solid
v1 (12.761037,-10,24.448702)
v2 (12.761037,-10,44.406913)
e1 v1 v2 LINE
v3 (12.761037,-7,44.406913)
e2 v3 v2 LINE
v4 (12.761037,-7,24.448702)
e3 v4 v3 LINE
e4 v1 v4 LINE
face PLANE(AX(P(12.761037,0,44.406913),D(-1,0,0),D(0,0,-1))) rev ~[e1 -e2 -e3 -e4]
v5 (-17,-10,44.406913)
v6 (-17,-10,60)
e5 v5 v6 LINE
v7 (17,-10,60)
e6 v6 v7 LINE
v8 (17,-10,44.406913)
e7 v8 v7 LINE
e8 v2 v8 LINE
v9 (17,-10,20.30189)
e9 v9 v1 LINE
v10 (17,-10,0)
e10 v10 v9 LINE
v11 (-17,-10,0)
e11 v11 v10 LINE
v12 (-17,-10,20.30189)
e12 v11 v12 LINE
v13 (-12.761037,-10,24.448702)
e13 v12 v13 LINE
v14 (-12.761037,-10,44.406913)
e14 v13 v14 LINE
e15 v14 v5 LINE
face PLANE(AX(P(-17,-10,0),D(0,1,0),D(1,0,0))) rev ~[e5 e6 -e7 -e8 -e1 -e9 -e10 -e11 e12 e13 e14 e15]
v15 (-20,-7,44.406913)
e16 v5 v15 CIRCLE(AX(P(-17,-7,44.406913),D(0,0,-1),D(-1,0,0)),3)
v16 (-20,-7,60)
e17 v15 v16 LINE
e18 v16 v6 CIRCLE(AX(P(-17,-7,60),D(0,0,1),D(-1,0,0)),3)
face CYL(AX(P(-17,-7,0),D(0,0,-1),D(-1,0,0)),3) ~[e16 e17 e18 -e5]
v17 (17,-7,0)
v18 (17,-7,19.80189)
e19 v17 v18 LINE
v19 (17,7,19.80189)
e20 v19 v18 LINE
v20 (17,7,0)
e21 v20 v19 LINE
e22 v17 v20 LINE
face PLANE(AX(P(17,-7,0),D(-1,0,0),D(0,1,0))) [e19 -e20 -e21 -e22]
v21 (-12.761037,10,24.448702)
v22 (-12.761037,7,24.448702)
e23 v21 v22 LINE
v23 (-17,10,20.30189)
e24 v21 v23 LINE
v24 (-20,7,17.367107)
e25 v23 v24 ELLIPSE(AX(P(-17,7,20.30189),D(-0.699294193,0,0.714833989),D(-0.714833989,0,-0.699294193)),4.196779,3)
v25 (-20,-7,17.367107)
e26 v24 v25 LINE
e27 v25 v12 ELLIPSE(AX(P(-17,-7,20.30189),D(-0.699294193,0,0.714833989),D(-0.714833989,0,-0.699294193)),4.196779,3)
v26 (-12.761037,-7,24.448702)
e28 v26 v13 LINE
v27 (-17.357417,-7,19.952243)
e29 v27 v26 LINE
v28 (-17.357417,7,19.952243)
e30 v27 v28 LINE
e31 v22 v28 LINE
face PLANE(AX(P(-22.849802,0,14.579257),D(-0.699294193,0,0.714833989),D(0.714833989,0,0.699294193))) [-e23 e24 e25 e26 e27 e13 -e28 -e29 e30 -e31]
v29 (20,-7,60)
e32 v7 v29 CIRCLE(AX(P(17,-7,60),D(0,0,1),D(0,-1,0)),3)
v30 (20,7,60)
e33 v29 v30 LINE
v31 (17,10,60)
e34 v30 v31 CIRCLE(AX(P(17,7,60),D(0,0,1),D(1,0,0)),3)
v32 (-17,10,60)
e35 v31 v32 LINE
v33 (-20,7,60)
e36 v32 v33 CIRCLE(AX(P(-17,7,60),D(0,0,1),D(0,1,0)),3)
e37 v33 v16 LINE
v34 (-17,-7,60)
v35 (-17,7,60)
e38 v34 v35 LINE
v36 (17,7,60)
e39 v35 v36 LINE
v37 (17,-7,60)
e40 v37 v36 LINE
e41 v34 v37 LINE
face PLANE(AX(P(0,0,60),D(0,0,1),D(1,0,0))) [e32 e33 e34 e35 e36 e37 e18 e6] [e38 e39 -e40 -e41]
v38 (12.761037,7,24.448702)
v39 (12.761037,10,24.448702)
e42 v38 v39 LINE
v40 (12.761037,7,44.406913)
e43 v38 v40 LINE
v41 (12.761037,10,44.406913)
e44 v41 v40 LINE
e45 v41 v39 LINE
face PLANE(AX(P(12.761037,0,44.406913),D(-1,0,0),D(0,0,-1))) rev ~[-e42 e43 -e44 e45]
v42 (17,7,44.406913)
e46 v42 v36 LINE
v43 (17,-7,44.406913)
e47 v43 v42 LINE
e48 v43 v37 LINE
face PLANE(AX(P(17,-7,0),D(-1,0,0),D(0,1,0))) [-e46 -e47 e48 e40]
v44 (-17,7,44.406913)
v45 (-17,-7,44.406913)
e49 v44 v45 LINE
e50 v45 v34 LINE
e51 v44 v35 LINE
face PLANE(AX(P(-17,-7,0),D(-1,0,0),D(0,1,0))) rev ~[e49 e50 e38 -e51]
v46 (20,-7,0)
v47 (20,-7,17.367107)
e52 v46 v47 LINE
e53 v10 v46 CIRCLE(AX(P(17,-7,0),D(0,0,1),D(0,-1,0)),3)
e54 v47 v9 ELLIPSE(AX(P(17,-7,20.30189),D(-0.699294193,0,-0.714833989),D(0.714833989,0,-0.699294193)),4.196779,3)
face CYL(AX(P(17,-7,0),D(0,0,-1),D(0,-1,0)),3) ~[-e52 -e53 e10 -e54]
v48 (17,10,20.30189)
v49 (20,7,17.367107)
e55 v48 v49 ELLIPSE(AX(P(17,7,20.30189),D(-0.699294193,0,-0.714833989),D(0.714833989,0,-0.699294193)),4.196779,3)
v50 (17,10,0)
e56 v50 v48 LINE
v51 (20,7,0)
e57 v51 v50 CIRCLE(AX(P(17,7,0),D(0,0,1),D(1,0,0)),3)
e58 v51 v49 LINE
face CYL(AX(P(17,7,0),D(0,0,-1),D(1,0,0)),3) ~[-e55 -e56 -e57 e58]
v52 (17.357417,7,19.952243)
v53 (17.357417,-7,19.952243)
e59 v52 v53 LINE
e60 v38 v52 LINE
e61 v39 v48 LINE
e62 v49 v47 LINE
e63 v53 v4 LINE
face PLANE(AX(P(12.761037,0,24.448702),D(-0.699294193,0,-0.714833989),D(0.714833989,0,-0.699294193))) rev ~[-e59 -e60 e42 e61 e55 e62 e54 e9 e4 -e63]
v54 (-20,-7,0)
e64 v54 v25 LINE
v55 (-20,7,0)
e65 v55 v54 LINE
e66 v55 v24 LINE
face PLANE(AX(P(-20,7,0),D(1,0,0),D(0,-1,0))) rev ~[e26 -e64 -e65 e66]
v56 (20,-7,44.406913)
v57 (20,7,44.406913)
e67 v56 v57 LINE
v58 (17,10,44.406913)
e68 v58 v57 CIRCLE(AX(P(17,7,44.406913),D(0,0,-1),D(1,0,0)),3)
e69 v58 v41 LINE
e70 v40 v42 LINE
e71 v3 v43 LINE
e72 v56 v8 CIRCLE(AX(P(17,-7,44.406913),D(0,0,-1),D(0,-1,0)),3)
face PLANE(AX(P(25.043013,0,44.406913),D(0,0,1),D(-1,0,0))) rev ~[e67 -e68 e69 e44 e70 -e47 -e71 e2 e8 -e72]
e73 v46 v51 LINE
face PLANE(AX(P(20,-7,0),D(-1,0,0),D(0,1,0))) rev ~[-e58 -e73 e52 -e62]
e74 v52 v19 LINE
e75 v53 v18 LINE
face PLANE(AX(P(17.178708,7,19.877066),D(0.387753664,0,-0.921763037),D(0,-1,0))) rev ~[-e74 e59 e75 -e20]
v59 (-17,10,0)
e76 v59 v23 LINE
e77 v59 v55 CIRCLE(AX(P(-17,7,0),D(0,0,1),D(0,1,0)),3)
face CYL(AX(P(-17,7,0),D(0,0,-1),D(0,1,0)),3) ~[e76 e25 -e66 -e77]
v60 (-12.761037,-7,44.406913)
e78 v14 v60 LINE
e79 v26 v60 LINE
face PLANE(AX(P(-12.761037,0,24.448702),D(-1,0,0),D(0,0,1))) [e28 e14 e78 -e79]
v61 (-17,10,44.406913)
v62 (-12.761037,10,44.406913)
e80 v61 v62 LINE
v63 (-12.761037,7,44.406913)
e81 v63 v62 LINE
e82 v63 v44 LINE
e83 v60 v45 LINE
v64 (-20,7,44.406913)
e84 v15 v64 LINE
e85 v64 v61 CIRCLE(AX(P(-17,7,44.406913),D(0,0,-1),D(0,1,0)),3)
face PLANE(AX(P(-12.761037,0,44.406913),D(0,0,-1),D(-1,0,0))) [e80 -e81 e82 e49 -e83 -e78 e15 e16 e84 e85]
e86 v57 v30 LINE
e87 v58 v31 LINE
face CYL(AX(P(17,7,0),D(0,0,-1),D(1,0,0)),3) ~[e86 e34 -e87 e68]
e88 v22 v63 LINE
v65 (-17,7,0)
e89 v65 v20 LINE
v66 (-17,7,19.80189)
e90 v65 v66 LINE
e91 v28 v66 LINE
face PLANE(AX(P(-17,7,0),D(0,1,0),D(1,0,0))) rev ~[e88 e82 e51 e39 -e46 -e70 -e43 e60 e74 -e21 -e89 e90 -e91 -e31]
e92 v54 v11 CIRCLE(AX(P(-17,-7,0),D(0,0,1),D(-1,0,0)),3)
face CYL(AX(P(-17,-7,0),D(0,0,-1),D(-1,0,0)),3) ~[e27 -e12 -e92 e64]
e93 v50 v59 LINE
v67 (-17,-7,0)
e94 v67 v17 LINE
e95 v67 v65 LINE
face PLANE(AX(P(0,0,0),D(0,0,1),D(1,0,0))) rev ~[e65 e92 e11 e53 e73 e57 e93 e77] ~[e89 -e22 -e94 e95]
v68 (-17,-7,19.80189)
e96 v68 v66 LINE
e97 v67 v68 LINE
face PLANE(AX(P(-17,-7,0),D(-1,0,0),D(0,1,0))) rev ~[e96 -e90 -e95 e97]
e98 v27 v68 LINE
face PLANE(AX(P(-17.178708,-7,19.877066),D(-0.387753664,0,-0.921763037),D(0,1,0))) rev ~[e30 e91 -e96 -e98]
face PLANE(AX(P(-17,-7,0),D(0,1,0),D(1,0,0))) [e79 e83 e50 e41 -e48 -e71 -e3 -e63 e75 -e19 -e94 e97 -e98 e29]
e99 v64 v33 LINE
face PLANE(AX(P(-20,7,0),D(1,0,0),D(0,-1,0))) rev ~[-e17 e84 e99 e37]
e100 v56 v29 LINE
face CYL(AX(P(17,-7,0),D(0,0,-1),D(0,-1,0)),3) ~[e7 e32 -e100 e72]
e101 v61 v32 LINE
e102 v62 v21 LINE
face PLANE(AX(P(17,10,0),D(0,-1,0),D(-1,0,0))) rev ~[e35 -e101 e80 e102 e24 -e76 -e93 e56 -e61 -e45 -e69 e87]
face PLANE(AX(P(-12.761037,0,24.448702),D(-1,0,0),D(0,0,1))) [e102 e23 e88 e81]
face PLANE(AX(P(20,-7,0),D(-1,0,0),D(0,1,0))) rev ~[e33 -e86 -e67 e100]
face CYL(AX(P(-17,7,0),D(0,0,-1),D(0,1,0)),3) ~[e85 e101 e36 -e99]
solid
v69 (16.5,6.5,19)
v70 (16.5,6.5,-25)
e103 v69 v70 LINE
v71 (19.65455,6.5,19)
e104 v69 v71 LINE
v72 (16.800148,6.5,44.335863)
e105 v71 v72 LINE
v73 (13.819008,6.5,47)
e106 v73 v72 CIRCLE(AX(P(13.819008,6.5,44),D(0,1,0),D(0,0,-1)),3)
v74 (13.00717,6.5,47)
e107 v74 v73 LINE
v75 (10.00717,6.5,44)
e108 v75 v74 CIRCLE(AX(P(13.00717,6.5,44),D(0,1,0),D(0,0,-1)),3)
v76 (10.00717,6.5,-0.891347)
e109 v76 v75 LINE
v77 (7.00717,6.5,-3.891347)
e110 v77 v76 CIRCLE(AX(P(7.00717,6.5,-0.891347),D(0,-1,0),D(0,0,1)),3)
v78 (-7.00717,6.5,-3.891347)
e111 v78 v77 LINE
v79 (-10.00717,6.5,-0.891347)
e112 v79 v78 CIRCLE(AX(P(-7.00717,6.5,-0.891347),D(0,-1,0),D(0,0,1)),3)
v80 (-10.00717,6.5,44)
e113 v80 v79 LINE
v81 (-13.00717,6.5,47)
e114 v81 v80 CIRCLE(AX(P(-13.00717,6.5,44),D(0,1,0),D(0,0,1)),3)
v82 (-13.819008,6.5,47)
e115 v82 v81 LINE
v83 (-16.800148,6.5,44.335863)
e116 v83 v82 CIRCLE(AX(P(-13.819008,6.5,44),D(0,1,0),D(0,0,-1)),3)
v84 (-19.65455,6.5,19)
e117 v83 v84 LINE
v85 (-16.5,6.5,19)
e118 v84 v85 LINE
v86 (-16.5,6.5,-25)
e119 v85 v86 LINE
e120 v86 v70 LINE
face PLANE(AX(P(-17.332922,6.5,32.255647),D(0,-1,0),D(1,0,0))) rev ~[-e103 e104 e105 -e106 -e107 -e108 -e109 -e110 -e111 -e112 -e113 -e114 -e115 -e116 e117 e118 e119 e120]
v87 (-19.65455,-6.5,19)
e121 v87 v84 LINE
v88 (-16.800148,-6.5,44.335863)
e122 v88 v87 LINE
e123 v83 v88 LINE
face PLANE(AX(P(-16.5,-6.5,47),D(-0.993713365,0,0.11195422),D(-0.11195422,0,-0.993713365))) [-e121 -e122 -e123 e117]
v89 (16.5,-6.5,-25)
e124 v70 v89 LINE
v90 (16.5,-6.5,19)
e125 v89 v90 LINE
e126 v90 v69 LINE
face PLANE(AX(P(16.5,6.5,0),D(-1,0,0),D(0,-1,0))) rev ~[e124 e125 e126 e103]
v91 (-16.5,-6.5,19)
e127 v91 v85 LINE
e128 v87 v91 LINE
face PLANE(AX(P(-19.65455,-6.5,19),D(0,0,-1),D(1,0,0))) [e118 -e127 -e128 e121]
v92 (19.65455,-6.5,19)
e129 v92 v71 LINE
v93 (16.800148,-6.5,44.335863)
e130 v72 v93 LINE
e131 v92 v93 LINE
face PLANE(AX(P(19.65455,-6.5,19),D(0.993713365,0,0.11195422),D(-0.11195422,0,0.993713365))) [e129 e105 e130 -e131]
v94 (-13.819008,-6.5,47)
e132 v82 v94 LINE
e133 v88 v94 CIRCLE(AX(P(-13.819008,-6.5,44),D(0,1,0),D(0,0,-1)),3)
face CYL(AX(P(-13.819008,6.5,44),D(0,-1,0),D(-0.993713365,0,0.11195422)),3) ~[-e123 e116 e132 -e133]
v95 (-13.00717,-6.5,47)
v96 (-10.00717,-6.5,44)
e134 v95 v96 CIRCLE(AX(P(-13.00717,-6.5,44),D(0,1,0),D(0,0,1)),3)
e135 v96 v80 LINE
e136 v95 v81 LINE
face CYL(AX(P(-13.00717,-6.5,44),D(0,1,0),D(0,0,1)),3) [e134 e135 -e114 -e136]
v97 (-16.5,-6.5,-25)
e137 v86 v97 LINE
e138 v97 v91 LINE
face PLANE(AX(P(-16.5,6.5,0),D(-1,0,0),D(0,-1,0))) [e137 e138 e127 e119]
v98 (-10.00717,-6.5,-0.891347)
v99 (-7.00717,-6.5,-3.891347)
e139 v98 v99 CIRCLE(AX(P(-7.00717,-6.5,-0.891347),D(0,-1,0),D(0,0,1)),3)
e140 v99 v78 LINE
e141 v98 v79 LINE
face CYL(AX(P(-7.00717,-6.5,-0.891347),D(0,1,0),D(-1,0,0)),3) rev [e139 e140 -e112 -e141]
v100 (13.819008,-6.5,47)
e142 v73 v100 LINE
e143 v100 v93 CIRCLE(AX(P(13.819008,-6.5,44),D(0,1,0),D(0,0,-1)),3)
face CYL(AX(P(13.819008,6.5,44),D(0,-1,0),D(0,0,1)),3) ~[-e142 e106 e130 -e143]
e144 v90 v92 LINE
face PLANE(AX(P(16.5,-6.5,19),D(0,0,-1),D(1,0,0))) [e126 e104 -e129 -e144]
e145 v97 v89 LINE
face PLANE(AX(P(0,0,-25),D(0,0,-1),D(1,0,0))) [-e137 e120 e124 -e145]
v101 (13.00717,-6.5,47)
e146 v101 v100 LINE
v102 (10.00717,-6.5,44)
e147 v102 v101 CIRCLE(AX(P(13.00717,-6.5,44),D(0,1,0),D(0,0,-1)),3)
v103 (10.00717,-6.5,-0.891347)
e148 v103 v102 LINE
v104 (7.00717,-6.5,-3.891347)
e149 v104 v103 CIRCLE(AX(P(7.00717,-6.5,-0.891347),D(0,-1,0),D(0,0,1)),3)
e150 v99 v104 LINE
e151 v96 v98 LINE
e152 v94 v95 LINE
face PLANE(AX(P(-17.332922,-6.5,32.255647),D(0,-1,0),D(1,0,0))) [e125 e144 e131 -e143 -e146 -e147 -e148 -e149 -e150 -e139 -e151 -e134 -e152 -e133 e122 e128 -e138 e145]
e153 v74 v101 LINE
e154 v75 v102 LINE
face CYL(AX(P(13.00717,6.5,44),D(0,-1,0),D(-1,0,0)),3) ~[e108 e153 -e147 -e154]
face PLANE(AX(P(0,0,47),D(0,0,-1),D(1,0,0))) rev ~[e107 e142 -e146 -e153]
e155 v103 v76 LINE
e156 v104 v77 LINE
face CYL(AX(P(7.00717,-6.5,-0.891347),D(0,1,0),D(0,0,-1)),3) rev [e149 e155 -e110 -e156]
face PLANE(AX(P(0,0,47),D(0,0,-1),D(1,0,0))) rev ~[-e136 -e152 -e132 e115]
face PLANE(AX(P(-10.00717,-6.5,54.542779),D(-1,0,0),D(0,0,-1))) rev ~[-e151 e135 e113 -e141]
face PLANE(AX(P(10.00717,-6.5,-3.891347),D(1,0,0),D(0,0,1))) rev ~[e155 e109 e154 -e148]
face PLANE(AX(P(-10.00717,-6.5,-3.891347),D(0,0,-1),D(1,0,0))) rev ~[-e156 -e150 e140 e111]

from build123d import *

# Parameters (mm, degrees)
F0_W      = 34
F0_H      = 14
F1_DEPTH  = 60
F3_DEPTH  = 12.5
F4_W      = 33
F4_H      = 13
F5_DEPTH  = 47
F6_DEPTH  = 25
F8_DEPTH  = 13
F9_W      = 10.0071702135
F9_H      = 7.5427786708
F10_DEPTH = 13
F11_R     = 3
F12_SIZE  = 0.5


with BuildPart() as f1:
    # F0 (on Top) → F1 (new body)
    with BuildSketch(Plane.XY):
        with BuildLine():
            Line((-17, -10), (17, -10))
            ThreePointArc((17, -10), (19.1213203436, -9.1213203436), (20, -7))
            Line((20, -7), (20, 7))
            ThreePointArc((20, 7), (19.1213203436, 9.1213203436), (17, 10))
            Line((17, 10), (-17, 10))
            ThreePointArc((-17, 10), (-19.1213203436, 9.1213203436), (-20, 7))
            Line((-20, 7), (-20, -7))
            ThreePointArc((-20, -7), (-19.1213203436, -9.1213203436), (-17, -10))
        make_face()
        Rectangle(F0_W, F0_H, mode=Mode.SUBTRACT)
    extrude(amount=F1_DEPTH)

    # F2 (on Front) → F3 (cut, symmetric)
    with BuildSketch(Plane.XZ):
        Polygon((-25.0430125743, 44.4069132209), (-22.8498019278, 14.5792569965), (-12.7610368654, 24.4487021118), (-12.7610368654, 44.4069132209), align=None)
        Polygon((22.8498019278, 14.5792569965), (25.0430125743, 44.4069132209), (12.7610368654, 44.4069132209), (12.7610368654, 24.4487021118), align=None)
    extrude(amount=F3_DEPTH, both=True, mode=Mode.SUBTRACT)

    # F12
    f12_edges = [f1.edges().sort_by_distance(p)[0] for p in [
        (17, 0, 20.30189),
        (-17, 0, 20.30189),
    ]]
    chamfer(f12_edges, length=F12_SIZE)


with BuildPart() as f5:
    # F4 (on face) → F5 (new body)
    with BuildSketch(Plane(origin=(0, 0, 0), x_dir=(1, 0, 0), z_dir=(0, 0, -1))):
        Rectangle(F4_W, F4_H)
    extrude(amount=-F5_DEPTH)

    # F6 (add): a face of the model
    f6_faces = [f5.faces().sort_by_distance(p)[0] for p in [
        (0, 0, 0),
    ]]
    extrude(f6_faces, amount=F6_DEPTH)

    # F7 (on face) → F8 (join, through all)
    with BuildSketch(Plane.XZ.offset(6.5)):
        Polygon((-16.5, 19), (-16.5, 47), (-19.6545496583, 19), align=None)
        Polygon((19.6545496583, 19), (16.5, 47), (16.5, 19), align=None)
    extrude(amount=-F8_DEPTH)

    # F9 (on face) → F10 (cut, through all)
    with BuildSketch(Plane.XZ.offset(6.5)):
        Polygon((-10.0071702135, 47), (-10.0071702135, 19), (-10.0071702135, -3.8913467145), (0, -3.8913467145), (0, 47), align=None)
        with Locations((-5.0035851068, 50.7713893354)):
            Rectangle(F9_W, F9_H)
        with Locations((5.0035851068, 50.7713893354)):
            Rectangle(F9_W, F9_H)
        Polygon((0, 47), (0, -3.8913467145), (10.0071702135, -3.8913467145), (10.0071702135, 19), (10.0071702135, 47), align=None)
    extrude(amount=-F10_DEPTH, mode=Mode.SUBTRACT)

    # F11
    f11_edges = [f5.edges().sort_by_distance(p)[0] for p in [
        (16.5, 0, 47),
        (-16.5, 0, 47),
        (-10.00717, 0, -3.891347),
        (10.00717, 0, -3.891347),
        (10.00717, 0, 47),
        (-10.00717, 0, 47),
    ]]
    fillet(f11_edges, radius=F11_R)


solid = Compound([f1.part, f5.part])
